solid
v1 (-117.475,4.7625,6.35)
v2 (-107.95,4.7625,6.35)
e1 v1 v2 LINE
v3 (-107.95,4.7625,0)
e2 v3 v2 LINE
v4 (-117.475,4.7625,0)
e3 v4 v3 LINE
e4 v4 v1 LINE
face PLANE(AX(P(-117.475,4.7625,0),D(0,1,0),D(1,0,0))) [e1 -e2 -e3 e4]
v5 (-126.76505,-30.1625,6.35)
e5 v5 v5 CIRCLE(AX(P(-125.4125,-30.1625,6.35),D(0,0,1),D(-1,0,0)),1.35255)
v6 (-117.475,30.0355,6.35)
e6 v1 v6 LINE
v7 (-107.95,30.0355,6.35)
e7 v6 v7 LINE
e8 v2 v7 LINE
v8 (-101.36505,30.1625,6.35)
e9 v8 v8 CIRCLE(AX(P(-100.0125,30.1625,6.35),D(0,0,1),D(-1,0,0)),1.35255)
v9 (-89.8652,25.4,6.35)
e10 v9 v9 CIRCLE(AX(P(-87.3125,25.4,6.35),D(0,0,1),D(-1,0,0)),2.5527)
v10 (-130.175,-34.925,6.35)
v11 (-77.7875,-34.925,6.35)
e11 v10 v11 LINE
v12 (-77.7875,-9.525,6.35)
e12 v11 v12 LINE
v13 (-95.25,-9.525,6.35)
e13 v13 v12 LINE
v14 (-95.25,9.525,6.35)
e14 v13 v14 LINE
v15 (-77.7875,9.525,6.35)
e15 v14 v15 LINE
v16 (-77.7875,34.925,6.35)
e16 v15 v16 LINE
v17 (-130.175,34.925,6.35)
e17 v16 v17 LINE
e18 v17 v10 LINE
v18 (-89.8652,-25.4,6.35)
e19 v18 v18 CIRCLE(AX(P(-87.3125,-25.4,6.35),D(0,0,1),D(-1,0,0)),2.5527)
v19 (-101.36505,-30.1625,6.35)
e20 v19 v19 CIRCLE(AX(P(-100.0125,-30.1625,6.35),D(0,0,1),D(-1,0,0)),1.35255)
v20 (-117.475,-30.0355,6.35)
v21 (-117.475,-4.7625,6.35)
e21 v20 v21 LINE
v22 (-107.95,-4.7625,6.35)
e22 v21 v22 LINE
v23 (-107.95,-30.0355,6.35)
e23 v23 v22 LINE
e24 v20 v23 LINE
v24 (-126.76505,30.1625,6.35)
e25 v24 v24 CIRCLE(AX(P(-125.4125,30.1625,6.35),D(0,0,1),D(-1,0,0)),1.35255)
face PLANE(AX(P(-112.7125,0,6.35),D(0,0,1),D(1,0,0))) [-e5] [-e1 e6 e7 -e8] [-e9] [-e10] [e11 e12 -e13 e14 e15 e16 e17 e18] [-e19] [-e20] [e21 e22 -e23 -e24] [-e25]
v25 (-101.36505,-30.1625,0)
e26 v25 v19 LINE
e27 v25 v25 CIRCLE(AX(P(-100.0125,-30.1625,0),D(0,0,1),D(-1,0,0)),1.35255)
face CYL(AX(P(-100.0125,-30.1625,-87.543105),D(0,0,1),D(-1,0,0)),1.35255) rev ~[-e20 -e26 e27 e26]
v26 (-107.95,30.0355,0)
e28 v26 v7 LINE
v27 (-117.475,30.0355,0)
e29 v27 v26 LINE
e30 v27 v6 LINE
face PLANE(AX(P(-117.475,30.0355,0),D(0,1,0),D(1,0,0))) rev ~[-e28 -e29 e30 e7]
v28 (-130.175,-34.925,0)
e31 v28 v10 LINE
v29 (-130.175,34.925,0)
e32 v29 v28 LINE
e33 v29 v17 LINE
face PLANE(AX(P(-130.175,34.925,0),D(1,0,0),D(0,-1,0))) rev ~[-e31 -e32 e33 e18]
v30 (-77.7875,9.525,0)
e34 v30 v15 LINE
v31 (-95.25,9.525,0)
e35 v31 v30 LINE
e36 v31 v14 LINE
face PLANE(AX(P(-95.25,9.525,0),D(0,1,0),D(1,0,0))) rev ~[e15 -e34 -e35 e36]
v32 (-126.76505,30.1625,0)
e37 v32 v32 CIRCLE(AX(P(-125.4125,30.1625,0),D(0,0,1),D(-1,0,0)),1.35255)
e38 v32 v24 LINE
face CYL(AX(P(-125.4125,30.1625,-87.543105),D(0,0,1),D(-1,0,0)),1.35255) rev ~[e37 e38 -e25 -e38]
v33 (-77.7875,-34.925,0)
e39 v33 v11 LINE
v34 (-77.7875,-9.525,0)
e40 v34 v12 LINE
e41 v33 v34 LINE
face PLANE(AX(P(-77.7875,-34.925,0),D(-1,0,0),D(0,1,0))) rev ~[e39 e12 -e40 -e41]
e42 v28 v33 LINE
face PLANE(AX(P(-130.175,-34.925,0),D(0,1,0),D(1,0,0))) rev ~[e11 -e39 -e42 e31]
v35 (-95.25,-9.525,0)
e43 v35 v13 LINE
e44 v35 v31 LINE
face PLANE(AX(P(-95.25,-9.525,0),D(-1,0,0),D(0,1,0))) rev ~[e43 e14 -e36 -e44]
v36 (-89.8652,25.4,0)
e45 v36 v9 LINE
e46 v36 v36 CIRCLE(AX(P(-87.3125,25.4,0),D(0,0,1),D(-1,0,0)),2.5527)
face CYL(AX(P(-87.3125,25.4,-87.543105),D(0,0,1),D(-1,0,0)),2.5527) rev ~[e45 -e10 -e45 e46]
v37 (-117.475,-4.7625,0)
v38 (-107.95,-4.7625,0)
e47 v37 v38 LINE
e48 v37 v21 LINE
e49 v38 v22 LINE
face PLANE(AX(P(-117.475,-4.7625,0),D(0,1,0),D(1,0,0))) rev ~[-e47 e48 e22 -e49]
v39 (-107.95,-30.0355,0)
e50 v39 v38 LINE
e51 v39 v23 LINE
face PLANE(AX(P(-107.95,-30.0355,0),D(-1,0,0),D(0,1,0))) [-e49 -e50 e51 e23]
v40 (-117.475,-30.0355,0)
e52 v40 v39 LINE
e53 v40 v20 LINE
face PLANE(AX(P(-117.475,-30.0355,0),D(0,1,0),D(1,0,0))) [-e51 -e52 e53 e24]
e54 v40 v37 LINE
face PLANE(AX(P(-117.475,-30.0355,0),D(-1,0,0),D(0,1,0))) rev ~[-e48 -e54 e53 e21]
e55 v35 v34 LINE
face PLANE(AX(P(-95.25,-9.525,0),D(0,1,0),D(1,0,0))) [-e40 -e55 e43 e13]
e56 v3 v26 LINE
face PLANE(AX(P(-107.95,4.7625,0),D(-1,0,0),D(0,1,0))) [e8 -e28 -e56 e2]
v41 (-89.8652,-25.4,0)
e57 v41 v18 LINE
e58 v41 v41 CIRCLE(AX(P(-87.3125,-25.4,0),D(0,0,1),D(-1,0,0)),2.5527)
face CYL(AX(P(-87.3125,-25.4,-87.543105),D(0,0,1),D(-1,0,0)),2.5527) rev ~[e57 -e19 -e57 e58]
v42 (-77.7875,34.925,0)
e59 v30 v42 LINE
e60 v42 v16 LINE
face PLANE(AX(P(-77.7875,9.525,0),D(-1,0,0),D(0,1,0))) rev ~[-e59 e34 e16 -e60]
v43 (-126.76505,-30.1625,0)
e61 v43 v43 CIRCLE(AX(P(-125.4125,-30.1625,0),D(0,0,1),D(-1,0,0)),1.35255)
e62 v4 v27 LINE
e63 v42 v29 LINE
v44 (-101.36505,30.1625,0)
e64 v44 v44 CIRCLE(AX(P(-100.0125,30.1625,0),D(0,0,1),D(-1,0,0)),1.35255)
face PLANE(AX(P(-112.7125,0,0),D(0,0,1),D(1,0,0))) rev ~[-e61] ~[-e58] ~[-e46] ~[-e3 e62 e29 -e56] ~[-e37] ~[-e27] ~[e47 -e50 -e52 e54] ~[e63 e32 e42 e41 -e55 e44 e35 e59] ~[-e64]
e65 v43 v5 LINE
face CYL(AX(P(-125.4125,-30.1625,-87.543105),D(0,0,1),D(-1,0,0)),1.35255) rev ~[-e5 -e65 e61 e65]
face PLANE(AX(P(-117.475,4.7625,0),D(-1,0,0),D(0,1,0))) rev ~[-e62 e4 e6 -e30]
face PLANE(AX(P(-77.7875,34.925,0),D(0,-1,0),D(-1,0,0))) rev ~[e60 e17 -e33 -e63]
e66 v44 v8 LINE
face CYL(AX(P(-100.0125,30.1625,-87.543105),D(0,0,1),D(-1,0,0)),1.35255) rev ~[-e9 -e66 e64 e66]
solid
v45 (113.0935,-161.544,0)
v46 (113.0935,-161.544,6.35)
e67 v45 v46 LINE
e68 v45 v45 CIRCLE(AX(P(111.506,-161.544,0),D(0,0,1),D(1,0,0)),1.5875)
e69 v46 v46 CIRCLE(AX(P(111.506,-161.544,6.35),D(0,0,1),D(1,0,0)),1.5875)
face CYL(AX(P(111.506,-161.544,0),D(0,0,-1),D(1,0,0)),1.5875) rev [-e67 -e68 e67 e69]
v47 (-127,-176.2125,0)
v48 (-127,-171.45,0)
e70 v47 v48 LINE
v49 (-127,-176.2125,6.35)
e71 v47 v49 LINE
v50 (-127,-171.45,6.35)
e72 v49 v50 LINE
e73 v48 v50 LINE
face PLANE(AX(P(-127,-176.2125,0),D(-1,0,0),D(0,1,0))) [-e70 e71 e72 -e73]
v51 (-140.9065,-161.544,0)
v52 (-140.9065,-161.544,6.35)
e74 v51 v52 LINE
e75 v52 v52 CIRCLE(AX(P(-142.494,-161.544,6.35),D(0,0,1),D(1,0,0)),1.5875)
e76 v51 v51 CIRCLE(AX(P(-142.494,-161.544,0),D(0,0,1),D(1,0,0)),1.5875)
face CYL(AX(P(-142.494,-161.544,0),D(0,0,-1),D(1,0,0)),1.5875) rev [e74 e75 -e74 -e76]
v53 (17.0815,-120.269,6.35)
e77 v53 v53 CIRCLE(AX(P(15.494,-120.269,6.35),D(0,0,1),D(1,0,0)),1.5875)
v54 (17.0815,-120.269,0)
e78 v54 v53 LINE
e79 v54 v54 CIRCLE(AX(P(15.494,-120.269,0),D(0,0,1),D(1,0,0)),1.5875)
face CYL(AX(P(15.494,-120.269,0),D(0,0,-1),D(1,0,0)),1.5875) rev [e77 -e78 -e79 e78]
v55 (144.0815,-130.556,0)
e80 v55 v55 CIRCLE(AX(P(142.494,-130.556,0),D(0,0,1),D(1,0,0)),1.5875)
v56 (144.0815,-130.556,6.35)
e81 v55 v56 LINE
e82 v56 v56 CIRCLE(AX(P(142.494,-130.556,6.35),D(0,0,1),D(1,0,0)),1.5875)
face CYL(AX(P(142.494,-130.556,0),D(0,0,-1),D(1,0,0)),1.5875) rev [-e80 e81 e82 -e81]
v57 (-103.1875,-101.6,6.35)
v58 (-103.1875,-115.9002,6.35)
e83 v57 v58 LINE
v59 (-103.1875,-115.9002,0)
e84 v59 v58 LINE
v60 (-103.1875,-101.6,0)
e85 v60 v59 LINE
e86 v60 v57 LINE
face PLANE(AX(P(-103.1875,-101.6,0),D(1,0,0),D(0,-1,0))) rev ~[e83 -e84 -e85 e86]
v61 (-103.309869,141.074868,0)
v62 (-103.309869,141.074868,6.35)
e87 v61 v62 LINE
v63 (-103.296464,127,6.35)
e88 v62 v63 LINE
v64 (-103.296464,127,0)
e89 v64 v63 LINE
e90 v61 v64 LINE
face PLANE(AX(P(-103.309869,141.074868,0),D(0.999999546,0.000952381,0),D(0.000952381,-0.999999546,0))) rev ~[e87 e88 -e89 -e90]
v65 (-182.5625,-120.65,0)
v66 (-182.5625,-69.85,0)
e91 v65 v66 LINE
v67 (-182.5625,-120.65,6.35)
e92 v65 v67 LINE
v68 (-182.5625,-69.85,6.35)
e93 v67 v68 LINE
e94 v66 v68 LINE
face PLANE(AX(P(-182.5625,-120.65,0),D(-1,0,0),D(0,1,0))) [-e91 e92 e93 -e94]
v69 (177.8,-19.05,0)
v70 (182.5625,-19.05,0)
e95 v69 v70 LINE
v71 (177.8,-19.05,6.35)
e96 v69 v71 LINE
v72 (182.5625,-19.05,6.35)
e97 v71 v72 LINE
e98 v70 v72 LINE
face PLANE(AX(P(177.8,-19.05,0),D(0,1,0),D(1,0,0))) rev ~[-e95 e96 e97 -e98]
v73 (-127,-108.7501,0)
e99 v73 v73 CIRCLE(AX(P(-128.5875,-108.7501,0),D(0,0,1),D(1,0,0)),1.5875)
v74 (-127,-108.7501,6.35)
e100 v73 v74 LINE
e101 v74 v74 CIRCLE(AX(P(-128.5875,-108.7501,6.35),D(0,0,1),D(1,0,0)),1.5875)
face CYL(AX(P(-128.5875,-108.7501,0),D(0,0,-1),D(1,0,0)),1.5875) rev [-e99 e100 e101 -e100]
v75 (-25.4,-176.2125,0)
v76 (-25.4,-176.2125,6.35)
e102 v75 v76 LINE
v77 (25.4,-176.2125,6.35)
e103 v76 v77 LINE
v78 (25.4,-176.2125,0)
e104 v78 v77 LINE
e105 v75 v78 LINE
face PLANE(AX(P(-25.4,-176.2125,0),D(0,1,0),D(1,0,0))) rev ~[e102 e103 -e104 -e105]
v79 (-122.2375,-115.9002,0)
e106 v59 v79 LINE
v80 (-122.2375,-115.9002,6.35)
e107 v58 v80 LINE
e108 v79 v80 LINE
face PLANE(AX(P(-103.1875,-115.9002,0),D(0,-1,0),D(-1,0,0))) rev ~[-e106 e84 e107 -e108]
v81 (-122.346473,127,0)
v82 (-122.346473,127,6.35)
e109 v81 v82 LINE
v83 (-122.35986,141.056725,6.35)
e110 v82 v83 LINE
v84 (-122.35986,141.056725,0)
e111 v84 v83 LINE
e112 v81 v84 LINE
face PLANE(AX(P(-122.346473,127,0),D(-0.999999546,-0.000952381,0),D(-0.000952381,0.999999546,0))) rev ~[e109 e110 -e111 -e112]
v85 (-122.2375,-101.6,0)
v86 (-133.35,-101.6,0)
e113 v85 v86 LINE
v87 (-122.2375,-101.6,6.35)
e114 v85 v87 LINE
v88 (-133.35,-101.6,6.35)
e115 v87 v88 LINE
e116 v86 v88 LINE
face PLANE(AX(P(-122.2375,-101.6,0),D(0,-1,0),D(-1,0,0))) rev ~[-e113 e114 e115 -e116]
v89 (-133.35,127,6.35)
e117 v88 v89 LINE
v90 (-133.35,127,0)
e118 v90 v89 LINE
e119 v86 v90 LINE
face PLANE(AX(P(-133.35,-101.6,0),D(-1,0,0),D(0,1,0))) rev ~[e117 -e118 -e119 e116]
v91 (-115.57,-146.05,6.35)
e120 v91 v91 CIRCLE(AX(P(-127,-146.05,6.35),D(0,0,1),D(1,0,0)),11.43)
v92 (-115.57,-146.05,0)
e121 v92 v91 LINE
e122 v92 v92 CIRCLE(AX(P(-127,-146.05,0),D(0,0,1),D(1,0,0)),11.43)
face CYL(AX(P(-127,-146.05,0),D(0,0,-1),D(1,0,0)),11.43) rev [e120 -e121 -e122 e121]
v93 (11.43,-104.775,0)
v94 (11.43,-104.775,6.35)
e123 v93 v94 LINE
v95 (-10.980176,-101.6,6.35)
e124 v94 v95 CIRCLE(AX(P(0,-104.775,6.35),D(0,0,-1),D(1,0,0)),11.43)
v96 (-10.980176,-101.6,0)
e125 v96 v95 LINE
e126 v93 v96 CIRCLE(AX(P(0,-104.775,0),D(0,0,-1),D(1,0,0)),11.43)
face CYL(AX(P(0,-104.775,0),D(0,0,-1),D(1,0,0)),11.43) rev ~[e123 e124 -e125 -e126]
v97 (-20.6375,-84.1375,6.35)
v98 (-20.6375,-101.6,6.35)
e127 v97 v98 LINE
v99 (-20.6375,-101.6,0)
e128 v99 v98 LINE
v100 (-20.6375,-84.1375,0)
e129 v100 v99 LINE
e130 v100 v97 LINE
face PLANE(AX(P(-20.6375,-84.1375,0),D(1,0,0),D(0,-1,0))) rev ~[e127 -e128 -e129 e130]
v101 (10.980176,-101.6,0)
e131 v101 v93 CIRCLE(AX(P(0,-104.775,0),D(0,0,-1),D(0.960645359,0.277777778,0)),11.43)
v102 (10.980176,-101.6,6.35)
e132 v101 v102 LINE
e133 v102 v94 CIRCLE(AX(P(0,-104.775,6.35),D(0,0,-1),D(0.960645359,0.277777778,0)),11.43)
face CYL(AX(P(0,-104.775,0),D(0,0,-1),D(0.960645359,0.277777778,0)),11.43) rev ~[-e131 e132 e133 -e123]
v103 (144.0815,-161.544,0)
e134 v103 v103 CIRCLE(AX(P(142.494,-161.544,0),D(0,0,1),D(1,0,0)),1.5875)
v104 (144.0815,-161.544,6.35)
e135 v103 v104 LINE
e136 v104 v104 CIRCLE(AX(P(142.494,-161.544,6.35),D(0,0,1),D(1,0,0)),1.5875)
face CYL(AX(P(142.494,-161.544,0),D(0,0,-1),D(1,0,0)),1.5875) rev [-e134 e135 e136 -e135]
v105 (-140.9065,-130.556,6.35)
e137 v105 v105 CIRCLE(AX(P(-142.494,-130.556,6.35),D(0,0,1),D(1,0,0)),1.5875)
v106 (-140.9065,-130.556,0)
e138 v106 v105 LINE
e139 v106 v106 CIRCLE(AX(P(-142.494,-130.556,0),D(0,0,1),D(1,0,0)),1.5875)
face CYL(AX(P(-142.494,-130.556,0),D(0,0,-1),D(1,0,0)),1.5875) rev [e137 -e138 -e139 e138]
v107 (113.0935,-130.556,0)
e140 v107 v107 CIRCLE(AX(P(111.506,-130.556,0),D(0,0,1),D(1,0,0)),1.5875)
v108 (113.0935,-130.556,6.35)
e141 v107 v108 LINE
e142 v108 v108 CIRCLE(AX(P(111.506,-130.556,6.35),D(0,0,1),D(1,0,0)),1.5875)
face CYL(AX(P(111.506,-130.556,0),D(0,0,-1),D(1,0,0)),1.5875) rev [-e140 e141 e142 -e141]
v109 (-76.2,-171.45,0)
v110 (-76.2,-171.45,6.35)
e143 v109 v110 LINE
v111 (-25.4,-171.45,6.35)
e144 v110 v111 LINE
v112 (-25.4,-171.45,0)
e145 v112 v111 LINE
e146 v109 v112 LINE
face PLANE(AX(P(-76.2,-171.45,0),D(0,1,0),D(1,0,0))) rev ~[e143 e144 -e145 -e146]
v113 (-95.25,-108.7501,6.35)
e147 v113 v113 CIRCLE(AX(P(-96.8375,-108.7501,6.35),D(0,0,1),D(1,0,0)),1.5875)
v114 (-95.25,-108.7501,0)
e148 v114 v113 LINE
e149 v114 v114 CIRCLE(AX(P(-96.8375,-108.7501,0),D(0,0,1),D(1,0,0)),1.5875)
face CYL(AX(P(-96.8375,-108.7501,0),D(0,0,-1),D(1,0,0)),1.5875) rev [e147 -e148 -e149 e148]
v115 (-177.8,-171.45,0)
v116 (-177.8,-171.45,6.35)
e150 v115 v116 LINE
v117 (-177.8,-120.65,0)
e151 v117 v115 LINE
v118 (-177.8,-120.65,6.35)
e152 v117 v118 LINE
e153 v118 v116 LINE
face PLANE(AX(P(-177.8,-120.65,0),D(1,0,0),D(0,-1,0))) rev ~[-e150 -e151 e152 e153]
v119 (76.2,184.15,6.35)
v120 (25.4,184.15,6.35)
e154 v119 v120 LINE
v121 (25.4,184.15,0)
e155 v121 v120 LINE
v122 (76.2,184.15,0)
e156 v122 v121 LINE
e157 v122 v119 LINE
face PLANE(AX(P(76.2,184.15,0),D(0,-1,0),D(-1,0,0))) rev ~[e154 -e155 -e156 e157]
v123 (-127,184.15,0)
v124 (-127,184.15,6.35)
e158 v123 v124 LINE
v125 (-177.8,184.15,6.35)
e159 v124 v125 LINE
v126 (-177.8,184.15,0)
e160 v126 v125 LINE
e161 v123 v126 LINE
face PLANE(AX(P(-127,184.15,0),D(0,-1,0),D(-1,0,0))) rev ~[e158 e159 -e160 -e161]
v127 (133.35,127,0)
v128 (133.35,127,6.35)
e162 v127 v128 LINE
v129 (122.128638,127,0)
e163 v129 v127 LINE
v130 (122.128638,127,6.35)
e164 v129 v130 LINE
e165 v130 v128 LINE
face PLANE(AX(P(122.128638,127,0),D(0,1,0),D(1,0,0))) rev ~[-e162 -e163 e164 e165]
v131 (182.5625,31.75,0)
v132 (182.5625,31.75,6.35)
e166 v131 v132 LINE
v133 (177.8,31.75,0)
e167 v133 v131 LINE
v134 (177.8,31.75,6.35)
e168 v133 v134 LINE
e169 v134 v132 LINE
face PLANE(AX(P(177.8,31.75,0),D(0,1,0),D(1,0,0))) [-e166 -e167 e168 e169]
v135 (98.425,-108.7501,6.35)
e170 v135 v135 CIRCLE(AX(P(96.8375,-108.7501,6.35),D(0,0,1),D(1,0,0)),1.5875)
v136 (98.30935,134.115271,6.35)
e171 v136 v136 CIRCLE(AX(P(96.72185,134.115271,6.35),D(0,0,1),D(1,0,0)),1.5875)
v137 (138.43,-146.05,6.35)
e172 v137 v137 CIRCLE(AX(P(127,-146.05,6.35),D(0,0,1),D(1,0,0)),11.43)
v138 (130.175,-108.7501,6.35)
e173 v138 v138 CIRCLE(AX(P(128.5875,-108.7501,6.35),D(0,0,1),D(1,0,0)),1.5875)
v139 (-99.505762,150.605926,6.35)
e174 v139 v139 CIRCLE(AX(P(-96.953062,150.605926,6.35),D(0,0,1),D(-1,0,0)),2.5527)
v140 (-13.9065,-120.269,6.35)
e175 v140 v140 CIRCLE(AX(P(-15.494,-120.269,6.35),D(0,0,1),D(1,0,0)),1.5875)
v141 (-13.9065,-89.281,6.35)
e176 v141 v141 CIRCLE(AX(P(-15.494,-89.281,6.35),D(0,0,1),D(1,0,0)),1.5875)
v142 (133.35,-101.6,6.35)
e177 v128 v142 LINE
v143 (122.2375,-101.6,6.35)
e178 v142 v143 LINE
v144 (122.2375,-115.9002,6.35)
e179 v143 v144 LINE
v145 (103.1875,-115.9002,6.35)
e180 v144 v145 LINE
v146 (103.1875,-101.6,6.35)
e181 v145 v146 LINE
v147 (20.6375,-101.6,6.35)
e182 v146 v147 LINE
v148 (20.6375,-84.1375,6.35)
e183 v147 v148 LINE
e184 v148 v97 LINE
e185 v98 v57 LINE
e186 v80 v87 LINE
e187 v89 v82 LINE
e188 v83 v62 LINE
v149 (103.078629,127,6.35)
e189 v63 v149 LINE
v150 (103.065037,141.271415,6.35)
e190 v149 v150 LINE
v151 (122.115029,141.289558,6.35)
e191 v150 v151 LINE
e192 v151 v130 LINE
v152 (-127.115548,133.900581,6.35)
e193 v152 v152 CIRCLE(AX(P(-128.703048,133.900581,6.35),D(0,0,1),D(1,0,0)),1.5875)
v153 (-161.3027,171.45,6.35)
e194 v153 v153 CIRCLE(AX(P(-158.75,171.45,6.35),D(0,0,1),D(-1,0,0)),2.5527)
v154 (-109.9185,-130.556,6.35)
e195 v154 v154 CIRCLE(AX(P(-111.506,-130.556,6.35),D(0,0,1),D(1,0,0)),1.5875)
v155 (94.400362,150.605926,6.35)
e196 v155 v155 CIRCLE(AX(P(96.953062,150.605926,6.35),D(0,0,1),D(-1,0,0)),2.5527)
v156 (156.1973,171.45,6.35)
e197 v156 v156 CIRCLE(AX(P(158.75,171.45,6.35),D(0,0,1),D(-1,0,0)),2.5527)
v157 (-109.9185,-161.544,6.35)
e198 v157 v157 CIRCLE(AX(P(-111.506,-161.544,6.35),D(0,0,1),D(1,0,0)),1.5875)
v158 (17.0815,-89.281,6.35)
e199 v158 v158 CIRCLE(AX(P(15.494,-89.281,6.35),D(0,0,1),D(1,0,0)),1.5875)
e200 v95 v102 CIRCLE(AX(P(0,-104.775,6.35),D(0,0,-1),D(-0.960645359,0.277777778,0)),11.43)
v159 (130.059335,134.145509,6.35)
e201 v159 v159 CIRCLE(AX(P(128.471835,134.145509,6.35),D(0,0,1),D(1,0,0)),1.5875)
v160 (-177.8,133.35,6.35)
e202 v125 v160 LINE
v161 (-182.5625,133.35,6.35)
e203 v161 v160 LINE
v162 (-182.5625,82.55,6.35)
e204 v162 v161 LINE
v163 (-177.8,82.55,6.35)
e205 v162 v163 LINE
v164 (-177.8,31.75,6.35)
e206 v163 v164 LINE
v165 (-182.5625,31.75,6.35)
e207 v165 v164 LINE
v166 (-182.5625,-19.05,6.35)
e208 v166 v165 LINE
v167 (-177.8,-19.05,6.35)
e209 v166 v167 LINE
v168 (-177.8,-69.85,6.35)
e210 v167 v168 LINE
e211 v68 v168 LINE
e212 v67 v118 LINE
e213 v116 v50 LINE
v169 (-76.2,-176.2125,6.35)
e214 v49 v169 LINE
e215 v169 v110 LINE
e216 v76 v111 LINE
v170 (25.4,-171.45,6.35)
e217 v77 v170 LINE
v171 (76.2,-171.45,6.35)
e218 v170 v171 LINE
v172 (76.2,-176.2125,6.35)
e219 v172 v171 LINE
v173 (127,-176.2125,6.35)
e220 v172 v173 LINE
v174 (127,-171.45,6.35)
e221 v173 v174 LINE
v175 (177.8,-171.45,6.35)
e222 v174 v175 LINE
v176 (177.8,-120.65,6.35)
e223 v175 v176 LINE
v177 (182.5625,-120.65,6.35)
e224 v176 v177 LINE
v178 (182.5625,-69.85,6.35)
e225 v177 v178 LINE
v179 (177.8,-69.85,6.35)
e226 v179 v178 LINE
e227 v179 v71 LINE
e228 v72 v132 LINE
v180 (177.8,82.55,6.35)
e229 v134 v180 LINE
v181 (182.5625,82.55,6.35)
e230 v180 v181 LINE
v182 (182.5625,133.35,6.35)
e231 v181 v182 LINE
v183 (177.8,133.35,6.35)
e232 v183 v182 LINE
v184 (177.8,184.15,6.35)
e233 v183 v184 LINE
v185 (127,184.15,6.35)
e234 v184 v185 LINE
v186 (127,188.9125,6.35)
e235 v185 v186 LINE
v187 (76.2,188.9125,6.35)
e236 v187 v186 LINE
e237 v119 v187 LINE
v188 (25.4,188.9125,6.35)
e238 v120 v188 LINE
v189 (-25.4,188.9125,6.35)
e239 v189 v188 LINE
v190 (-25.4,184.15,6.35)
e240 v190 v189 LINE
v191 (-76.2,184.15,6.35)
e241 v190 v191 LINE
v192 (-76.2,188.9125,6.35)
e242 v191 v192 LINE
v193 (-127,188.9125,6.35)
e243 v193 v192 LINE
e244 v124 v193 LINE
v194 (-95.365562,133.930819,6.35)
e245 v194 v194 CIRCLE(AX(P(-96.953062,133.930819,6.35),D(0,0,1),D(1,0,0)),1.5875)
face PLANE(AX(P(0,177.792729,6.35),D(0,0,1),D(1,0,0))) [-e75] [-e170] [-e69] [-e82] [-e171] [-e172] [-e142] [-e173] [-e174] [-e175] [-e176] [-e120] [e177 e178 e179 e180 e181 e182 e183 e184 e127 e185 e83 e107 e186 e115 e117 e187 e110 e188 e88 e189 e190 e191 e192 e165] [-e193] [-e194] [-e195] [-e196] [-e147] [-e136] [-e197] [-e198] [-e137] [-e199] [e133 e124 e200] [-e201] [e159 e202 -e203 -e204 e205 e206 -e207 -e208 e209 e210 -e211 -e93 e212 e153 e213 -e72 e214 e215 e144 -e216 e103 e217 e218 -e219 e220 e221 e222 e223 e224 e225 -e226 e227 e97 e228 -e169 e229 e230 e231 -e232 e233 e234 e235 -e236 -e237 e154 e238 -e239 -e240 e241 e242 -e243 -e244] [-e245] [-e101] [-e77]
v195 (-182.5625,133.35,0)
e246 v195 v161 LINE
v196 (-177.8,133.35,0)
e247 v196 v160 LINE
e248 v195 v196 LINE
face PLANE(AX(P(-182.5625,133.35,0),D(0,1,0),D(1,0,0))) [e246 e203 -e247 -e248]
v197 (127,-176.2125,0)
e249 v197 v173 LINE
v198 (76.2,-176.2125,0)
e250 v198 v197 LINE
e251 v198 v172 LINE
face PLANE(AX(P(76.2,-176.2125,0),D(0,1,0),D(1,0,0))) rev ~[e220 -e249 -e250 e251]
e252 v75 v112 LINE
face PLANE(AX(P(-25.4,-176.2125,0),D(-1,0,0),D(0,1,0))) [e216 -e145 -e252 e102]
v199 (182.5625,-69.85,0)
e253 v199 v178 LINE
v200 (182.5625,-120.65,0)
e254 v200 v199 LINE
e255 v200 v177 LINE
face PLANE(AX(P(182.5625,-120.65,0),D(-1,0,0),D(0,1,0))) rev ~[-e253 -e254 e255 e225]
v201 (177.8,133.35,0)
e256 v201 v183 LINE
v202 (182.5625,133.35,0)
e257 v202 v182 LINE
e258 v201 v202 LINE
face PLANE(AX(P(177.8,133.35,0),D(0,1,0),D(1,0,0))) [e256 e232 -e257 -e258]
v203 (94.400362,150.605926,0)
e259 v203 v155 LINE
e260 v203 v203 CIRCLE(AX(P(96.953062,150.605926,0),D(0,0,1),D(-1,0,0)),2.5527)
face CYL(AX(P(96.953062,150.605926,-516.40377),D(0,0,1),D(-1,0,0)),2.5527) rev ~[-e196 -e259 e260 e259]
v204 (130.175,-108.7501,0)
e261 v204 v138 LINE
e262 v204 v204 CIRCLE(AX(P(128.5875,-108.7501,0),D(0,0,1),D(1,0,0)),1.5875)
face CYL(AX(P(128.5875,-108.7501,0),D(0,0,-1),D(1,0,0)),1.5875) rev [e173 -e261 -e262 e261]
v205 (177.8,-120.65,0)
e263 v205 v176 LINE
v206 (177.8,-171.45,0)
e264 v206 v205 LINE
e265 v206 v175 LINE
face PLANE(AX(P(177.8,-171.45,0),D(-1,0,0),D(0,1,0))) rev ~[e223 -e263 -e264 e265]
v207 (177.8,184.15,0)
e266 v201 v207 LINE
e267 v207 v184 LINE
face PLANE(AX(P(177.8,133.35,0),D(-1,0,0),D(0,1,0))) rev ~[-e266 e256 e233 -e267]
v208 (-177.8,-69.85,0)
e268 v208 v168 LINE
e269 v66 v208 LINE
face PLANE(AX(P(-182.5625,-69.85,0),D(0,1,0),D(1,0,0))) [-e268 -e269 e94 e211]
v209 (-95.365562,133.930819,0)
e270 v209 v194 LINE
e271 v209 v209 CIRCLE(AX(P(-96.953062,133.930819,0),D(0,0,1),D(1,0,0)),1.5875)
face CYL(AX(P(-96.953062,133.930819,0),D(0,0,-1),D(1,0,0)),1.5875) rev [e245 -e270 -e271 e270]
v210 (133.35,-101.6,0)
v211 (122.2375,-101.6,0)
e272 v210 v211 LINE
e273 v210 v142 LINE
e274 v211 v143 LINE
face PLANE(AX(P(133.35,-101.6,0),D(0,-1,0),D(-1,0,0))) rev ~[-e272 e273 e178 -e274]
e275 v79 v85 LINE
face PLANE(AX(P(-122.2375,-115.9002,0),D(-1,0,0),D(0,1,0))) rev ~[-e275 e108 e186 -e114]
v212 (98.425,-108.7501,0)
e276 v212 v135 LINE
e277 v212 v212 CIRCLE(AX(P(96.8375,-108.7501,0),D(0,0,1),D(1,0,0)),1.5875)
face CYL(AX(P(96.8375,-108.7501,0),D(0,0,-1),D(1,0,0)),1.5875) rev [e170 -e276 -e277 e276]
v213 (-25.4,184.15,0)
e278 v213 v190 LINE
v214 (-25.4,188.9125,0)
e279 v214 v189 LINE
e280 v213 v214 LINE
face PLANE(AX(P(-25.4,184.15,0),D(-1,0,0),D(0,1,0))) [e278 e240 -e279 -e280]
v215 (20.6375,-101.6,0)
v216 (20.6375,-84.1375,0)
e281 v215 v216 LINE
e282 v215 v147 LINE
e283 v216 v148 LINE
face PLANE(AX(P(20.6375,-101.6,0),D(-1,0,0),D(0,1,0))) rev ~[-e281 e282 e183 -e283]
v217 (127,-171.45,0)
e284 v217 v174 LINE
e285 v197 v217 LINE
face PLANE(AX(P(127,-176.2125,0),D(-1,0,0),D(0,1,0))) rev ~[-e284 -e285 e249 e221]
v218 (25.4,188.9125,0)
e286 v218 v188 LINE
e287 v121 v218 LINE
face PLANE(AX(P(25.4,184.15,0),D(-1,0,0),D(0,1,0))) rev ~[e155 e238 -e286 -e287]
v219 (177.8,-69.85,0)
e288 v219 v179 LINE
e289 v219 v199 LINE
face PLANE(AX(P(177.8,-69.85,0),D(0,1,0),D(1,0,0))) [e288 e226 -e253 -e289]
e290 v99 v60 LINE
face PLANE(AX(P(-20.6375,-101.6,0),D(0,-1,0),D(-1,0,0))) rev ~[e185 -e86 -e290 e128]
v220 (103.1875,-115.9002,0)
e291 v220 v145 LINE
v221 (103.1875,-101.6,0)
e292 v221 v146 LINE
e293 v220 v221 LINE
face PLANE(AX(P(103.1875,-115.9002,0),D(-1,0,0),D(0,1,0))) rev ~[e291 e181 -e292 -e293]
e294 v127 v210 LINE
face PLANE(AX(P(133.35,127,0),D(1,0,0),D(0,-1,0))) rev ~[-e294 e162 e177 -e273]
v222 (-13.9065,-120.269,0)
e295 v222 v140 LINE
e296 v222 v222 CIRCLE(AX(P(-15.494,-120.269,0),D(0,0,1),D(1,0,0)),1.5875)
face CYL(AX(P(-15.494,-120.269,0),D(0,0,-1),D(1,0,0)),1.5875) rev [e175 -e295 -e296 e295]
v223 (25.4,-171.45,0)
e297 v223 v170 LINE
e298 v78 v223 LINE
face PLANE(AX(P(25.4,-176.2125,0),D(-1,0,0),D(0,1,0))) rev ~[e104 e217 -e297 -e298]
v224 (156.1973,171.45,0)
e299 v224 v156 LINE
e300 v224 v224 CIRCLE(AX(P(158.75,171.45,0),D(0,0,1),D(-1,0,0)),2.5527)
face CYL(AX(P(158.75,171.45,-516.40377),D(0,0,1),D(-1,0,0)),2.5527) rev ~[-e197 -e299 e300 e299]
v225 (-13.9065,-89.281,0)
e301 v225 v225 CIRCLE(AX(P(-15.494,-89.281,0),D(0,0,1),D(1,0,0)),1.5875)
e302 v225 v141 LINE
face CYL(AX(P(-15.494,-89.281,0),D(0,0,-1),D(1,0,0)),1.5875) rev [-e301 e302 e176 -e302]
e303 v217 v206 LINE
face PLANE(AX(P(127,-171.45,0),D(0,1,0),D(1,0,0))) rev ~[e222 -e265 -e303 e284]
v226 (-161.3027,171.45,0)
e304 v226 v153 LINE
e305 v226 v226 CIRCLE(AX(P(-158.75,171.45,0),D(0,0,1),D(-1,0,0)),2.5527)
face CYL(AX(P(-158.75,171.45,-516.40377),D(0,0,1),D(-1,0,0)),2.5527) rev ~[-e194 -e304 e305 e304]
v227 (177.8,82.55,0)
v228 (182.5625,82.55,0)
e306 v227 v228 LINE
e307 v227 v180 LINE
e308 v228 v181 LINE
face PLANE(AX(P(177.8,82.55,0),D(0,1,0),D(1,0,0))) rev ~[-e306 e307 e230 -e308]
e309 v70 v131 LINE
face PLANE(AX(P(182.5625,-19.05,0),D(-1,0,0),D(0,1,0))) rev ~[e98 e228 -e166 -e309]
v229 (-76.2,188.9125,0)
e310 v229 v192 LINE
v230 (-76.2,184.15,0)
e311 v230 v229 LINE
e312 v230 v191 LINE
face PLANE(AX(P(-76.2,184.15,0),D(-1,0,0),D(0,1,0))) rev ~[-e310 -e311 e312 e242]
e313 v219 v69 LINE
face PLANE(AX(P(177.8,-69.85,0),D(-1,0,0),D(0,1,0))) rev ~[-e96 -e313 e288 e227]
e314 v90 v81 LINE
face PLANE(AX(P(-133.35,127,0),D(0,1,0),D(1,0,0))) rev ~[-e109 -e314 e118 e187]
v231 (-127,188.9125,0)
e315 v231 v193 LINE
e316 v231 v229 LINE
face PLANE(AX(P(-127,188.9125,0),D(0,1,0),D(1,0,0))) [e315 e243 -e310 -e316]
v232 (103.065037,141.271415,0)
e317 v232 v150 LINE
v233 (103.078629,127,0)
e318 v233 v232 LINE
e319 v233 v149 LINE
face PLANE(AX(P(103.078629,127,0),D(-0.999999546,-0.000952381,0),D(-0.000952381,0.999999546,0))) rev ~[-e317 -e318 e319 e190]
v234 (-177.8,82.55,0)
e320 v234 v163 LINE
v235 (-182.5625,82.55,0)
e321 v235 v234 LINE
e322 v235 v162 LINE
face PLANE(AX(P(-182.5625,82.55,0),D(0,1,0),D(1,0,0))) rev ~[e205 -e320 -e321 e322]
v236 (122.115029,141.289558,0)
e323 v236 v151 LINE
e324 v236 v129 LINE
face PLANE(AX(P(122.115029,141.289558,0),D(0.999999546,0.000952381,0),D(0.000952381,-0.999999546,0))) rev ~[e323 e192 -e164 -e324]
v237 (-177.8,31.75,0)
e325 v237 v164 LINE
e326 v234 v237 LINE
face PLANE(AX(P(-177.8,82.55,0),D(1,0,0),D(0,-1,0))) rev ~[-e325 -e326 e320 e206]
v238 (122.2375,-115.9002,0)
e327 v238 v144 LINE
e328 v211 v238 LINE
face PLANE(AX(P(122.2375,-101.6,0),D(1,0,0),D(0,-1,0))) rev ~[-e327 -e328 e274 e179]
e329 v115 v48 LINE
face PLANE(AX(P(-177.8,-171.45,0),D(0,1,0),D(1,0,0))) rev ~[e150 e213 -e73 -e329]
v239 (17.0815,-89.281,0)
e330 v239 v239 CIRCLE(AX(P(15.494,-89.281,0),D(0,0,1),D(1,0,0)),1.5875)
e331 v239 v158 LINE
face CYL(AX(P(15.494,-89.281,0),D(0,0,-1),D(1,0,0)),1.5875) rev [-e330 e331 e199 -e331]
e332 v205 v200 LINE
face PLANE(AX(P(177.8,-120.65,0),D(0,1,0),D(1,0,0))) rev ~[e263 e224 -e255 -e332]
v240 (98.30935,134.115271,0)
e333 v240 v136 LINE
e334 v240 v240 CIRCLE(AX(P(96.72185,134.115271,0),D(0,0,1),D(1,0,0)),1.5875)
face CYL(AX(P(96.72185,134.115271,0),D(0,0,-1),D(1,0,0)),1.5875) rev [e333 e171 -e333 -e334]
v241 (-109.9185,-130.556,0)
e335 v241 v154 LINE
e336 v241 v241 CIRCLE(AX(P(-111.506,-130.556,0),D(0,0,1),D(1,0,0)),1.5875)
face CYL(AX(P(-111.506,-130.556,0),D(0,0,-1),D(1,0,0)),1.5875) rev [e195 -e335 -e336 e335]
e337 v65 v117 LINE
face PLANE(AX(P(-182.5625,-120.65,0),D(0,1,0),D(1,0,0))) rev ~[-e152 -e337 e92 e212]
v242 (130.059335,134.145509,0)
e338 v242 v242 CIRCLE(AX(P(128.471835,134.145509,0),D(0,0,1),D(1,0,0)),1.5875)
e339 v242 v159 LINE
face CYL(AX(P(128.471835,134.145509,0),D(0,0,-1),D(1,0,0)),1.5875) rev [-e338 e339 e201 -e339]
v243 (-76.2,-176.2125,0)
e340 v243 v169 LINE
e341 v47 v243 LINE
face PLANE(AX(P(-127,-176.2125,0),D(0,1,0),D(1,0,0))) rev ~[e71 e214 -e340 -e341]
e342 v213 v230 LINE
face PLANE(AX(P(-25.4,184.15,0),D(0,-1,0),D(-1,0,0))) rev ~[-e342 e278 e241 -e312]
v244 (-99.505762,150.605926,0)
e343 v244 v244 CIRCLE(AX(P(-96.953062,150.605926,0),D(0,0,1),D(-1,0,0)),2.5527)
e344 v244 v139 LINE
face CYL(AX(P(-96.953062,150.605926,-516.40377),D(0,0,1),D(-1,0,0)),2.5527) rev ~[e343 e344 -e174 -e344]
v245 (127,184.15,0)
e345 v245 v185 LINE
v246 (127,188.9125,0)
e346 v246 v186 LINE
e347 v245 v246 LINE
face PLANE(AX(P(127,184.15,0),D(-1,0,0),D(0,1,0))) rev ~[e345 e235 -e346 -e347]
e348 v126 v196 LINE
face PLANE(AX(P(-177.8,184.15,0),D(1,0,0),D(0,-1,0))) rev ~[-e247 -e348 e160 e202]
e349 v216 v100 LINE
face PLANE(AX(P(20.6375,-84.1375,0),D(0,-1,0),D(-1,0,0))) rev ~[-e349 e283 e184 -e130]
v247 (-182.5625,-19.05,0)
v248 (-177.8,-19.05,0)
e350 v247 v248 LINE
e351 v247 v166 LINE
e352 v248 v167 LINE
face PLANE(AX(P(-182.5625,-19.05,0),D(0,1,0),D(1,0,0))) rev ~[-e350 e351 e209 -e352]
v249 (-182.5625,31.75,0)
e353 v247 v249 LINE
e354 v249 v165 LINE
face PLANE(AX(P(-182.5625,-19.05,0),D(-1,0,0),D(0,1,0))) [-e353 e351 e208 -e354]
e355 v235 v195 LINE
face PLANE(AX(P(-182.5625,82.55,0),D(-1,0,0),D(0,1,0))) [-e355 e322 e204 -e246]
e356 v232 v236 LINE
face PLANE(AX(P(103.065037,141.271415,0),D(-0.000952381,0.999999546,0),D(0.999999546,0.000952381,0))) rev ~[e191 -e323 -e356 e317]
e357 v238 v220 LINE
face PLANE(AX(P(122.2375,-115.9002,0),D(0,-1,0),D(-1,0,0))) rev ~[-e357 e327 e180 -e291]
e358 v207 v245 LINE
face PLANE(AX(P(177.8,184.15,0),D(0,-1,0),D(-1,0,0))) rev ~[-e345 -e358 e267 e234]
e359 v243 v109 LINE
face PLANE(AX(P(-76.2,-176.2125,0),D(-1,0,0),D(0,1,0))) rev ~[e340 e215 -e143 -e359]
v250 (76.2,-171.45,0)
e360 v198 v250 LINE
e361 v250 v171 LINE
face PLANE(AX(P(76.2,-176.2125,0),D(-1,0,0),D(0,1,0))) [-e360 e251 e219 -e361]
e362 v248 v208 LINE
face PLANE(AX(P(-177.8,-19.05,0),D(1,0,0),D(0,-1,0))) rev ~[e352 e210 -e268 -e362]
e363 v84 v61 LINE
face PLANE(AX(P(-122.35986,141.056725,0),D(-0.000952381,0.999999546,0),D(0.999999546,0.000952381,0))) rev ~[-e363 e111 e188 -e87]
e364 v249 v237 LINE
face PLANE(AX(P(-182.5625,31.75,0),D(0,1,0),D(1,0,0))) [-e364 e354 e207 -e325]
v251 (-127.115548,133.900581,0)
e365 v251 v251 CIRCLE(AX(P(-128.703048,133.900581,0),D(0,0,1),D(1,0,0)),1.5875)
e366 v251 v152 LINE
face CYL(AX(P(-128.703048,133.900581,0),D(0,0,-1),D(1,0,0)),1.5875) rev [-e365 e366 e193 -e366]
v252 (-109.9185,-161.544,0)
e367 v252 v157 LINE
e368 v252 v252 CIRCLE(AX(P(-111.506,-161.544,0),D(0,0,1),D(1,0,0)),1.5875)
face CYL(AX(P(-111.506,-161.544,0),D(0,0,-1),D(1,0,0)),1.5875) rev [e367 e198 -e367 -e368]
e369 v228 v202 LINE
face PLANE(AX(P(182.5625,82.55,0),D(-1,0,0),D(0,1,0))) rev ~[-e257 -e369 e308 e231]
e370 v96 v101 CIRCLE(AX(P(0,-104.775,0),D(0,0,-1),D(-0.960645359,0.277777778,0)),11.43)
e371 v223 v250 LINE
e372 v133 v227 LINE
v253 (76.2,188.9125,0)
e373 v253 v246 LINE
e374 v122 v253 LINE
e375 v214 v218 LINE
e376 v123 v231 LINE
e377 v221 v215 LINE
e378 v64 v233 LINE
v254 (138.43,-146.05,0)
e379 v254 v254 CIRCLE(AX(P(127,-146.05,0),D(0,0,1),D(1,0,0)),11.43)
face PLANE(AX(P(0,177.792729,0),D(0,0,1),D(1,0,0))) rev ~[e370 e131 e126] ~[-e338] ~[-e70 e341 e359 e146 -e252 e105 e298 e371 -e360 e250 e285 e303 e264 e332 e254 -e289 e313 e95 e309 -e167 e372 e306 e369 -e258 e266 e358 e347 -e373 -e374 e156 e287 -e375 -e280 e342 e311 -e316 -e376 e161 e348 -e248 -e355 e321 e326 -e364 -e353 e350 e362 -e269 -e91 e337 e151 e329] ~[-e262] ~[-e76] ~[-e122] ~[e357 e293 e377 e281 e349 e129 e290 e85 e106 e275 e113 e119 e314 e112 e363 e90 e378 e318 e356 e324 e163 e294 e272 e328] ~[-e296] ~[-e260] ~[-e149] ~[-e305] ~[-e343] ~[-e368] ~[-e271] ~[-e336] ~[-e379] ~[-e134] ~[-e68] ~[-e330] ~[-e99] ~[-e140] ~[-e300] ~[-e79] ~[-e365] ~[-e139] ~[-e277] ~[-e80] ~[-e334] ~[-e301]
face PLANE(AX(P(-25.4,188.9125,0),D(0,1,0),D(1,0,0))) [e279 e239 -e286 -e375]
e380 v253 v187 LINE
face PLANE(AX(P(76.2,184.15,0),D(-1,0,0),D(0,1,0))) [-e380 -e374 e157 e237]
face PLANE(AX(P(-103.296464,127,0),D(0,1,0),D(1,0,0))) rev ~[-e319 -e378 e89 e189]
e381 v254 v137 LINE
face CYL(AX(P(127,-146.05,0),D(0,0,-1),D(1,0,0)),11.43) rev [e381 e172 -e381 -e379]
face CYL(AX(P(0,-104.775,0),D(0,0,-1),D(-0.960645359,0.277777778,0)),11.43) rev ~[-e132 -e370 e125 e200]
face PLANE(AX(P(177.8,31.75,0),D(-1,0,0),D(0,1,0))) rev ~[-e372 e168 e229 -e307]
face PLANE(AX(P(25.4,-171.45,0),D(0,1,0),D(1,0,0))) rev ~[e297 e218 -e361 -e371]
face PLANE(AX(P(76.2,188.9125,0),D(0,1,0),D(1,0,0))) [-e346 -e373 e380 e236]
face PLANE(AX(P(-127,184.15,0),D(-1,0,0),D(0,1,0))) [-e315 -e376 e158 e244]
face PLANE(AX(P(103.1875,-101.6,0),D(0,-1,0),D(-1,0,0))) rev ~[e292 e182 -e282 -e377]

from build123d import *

# Parameters (mm, degrees)
F0_R     = 1.5875
F0_R_2   = 11.43
F0_R_3   = 3.175
F0_W     = 4.7625
F0_H     = 50.8
F0_W_2   = 50.8
F0_H_2   = 4.7625
F0_W_3   = 44.45
F0_H_3   = 41.1268851364
F1_DEPTH = 6.35
F0_R_4   = 1.8415
F0_W_4   = 9.525
F0_H_4   = 25.273
F0_W_5   = 17.4625
F0_H_5   = 25.4
F2_D     = 2.7051
F3_D     = 5.1054
F4_D     = 5.1054


# Not quite as in the source:
# - a feature names something its author has since deleted; it is built from what else it names


with BuildPart() as f1:
    # F0 (on Top) → F1 (new body)
    with BuildSketch(Plane.XY):
        with BuildLine():
            ThreePointArc((155.575, 171.45), (158.75, 174.625), (161.925, 171.45))
            Line((161.925, 171.45), (177.8, 171.45))
            Line((177.8, 171.45), (177.8, 184.15))
            Line((177.8, 184.15), (127, 184.15))
            Line((127, 184.15), (76.2, 184.15))
            Line((76.2, 184.15), (25.4, 184.15))
            Line((25.4, 184.15), (-25.4, 184.15))
            Line((-25.4, 184.15), (-76.2, 184.15))
            Line((-76.2, 184.15), (-127, 184.15))
            Line((-127, 184.15), (-177.8, 184.15))
            Line((-177.8, 184.15), (-177.8, 171.45))
            Line((-177.8, 171.45), (-161.925, 171.45))
            ThreePointArc((-161.925, 171.45), (-158.75, 174.625), (-155.575, 171.45))
            Line((-155.575, 171.45), (155.575, 171.45))
        make_face()
        with BuildLine():
            ThreePointArc((155.575, 171.45), (158.75, 168.275), (161.925, 171.45))
            Line((161.925, 171.45), (155.575, 171.45))
        make_face()
        with BuildLine():
            Line((155.575, 171.45), (161.925, 171.45))
            ThreePointArc((161.925, 171.45), (158.75, 174.625), (155.575, 171.45))
        make_face()
        with BuildLine():
            Line((177.8, 171.45), (161.925, 171.45))
            ThreePointArc((161.925, 171.45), (158.75, 168.275), (155.575, 171.45))
            Line((155.575, 171.45), (-155.575, 171.45))
            ThreePointArc((-155.575, 171.45), (-158.75, 168.275), (-161.925, 171.45))
            Line((-161.925, 171.45), (-177.8, 171.45))
            Line((-177.8, 171.45), (-177.8, 133.35))
            Line((-177.8, 133.35), (-177.8, 82.55))
            Line((-177.8, 82.55), (-177.8, 31.75))
            Line((-177.8, 31.75), (-177.8, -19.05))
            Line((-177.8, -19.05), (-177.8, -69.85))
            Line((-177.8, -69.85), (-177.8, -120.65))
            Line((-177.8, -120.65), (-177.8, -171.45))
            Line((-177.8, -171.45), (-127, -171.45))
            Line((-127, -171.45), (-76.2, -171.45))
            Line((-76.2, -171.45), (-25.4, -171.45))
            Line((-25.4, -171.45), (25.4, -171.45))
            Line((25.4, -171.45), (76.2, -171.45))
            Line((76.2, -171.45), (127, -171.45))
            Line((127, -171.45), (177.8, -171.45))
            Line((177.8, -171.45), (177.8, -120.65))
            Line((177.8, -120.65), (177.8, -69.85))
            Line((177.8, -69.85), (177.8, -19.05))
            Line((177.8, -19.05), (177.8, 31.75))
            Line((177.8, 31.75), (177.8, 82.55))
            Line((177.8, 82.55), (177.8, 133.35))
            Line((177.8, 133.35), (177.8, 171.45))
        make_face()
        with Locations((-142.494, -161.544)):
            Circle(F0_R, mode=Mode.SUBTRACT)
        with Locations((-111.506, -161.544)):
            Circle(F0_R, mode=Mode.SUBTRACT)
        with Locations((-127, -146.05)):
            Circle(F0_R_2, mode=Mode.SUBTRACT)
        with Locations((-142.494, -130.556)):
            Circle(F0_R, mode=Mode.SUBTRACT)
        with Locations((-128.5875, -108.7501)):
            Circle(F0_R, mode=Mode.SUBTRACT)
        with Locations((-111.506, -130.556)):
            Circle(F0_R, mode=Mode.SUBTRACT)
        with Locations((-96.8375, -108.7501)):
            Circle(F0_R, mode=Mode.SUBTRACT)
        with Locations((111.506, -161.544)):
            Circle(F0_R, mode=Mode.SUBTRACT)
        with Locations((127, -146.05)):
            Circle(F0_R_2, mode=Mode.SUBTRACT)
        with Locations((142.494, -161.544)):
            Circle(F0_R, mode=Mode.SUBTRACT)
        with Locations((111.506, -130.556)):
            Circle(F0_R, mode=Mode.SUBTRACT)
        with Locations((96.8375, -108.7501)):
            Circle(F0_R, mode=Mode.SUBTRACT)
        with Locations((128.5875, -108.7501)):
            Circle(F0_R, mode=Mode.SUBTRACT)
        with Locations((142.494, -130.556)):
            Circle(F0_R, mode=Mode.SUBTRACT)
        with Locations((-128.7030479432, 133.9005806915)):
            Circle(F0_R, mode=Mode.SUBTRACT)
        with Locations((-96.9530623423, 133.9308187798)):
            Circle(F0_R, mode=Mode.SUBTRACT)
        with Locations((-96.9530623423, 150.6059263422)):
            Circle(F0_R_3, mode=Mode.SUBTRACT)
        Polygon((-122.2375, -101.6), (-133.35, -101.6), (-133.35, 126.746051779), (-133.35, 127), (-122.3464730803, 127), (-122.3598604405, 141.0567250664), (-103.30986908, 141.0748679195), (-103.2964644408, 127), (-22.225, 127), (-22.225, 168.1268851364), (22.225, 168.1268851364), (22.225, 127), (103.0786291533, 127), (103.065037326, 141.2714154939), (122.1150286865, 141.289558347), (122.1286377928, 127), (133.2411428818, 127), (133.35, 127), (133.35, -101.6), (122.2375, -101.6), (122.2375, -115.9002), (103.1875, -115.9002), (103.1875, -101.6), (20.6375, -101.6), (20.6375, -125.4125), (-20.6375, -125.4125), (-20.6375, -101.6), (-103.1875, -101.6), (-103.1875, -115.9002), (-122.2375, -115.9002), align=None, mode=Mode.SUBTRACT)
        with Locations((96.7218498233, 134.115271119)):
            Circle(F0_R, mode=Mode.SUBTRACT)
        with Locations((128.4718354242, 134.1455092073)):
            Circle(F0_R, mode=Mode.SUBTRACT)
        with Locations((96.9530623423, 150.6059263422)):
            Circle(F0_R_3, mode=Mode.SUBTRACT)
        with Locations((180.18125, 107.95)):
            Rectangle(F0_W, F0_H)
        with BuildLine():
            ThreePointArc((-161.925, 171.45), (-158.75, 168.275), (-155.575, 171.45))
            Line((-155.575, 171.45), (-161.925, 171.45))
        make_face()
        with BuildLine():
            Line((-161.925, 171.45), (-155.575, 171.45))
            ThreePointArc((-155.575, 171.45), (-158.75, 174.625), (-161.925, 171.45))
        make_face()
        with Locations((101.6, 186.53125)):
            Rectangle(F0_W_2, F0_H_2)
        with Locations((180.18125, 6.35)):
            Rectangle(F0_W, F0_H)
        with Locations((0, 186.53125)):
            Rectangle(F0_W_2, F0_H_2)
        with Locations((-180.18125, 107.95)):
            Rectangle(F0_W, F0_H)
        with Locations((180.18125, -95.25)):
            Rectangle(F0_W, F0_H)
        with Locations((-101.6, 186.53125)):
            Rectangle(F0_W_2, F0_H_2)
        with Locations((-180.18125, 6.35)):
            Rectangle(F0_W, F0_H)
        with Locations((101.6, -173.83125)):
            Rectangle(F0_W_2, F0_H_2)
        with Locations((-180.18125, -95.25)):
            Rectangle(F0_W, F0_H)
        with Locations((0, -173.83125)):
            Rectangle(F0_W_2, F0_H_2)
        with Locations((-101.6, -173.83125)):
            Rectangle(F0_W_2, F0_H_2)
        with BuildLine():
            Line((-20.6375, -84.1375), (-20.6375, -101.6))
            Line((-20.6375, -101.6), (-10.9801764558, -101.6))
            ThreePointArc((-10.9801764558, -101.6), (0, -93.345), (10.9801764558, -101.6))
            Line((10.9801764558, -101.6), (20.6375, -101.6))
            Line((20.6375, -101.6), (20.6375, -84.1375))
            Line((20.6375, -84.1375), (-20.6375, -84.1375))
        make_face()
        with Locations((-15.494, -89.281)):
            Circle(F0_R, mode=Mode.SUBTRACT)
        with Locations((15.494, -89.281)):
            Circle(F0_R, mode=Mode.SUBTRACT)
        with BuildLine():
            Line((-10.9801764558, -101.6), (-20.6375, -101.6))
            Line((-20.6375, -101.6), (-20.6375, -125.4125))
            Line((-20.6375, -125.4125), (20.6375, -125.4125))
            Line((20.6375, -125.4125), (20.6375, -101.6))
            Line((20.6375, -101.6), (10.9801764558, -101.6))
            ThreePointArc((10.9801764558, -101.6), (11.3169853956, -103.1716467778), (11.43, -104.775))
            ThreePointArc((11.43, -104.775), (-1.6033532222, -116.0919853956), (-10.9801764558, -101.6))
        make_face()
        with Locations((-15.494, -120.269)):
            Circle(F0_R, mode=Mode.SUBTRACT)
        with Locations((15.494, -120.269)):
            Circle(F0_R, mode=Mode.SUBTRACT)
        with Locations((0, 147.5634425682)):
            Rectangle(F0_W_3, F0_H_3)
        with Locations((-96.9530623423, 150.6059263422)):
            Circle(F0_R_3)
        with Locations((96.9530623423, 150.6059263422)):
            Circle(F0_R_3)
    extrude(amount=F1_DEPTH)

    # F4 (through all)
    with Locations(Plane(origin=(0, 0, 0), x_dir=(1, 0, 0), z_dir=(0, 0, -1))):
        with Locations((-158.75, -171.45), (-96.9530623423, -150.6059263422), (96.9530623423, -150.6059263422), (158.75, -171.45)):
            Hole(F4_D / 2)


with BuildPart() as f1b:
    # F0 (on Top) → F1, piece 2 (new body)
    with BuildSketch(Plane.XY):
        Polygon((-100.0125, 34.925), (-130.175, 34.925), (-130.175, -34.925), (-100.0125, -34.925), (-95.25, -34.925), (-95.25, -9.525), (-95.25, 9.525), (-95.25, 34.925), align=None)
        with Locations((-125.4125, -30.1625)):
            Circle(F0_R_4, mode=Mode.SUBTRACT)
        with Locations((-100.0125, -30.1625)):
            Circle(F0_R_4, mode=Mode.SUBTRACT)
        with Locations((-112.7125, -17.399)):
            Rectangle(F0_W_4, F0_H_4, mode=Mode.SUBTRACT)
        with Locations((-112.7125, 17.399)):
            Rectangle(F0_W_4, F0_H_4, mode=Mode.SUBTRACT)
        with Locations((-125.4125, 30.1625)):
            Circle(F0_R_4, mode=Mode.SUBTRACT)
        with Locations((-100.0125, 30.1625)):
            Circle(F0_R_4, mode=Mode.SUBTRACT)
        with Locations((-86.51875, 22.225)):
            Rectangle(F0_W_5, F0_H_5)
        with Locations((-87.3125, 25.4)):
            Circle(F0_R_3, mode=Mode.SUBTRACT)
        with Locations((-86.51875, -22.225)):
            Rectangle(F0_W_5, F0_H_5)
        with Locations((-87.3125, -25.4)):
            Circle(F0_R_3, mode=Mode.SUBTRACT)
        with Locations((-87.3125, 25.4)):
            Circle(F0_R_3)
        with Locations((-87.3125, -25.4)):
            Circle(F0_R_3)
        with Locations((-125.4125, 30.1625)):
            Circle(F0_R_4)
        with Locations((-100.0125, 30.1625)):
            Circle(F0_R_4)
        with Locations((-125.4125, -30.1625)):
            Circle(F0_R_4)
        with Locations((-100.0125, -30.1625)):
            Circle(F0_R_4)
    extrude(amount=F1_DEPTH)

    # F2 (through all)
    with Locations(Plane(origin=(0, 0, 0), x_dir=(1, 0, 0), z_dir=(0, 0, -1))):
        with Locations((-125.4125, -30.1625), (-100.0125, -30.1625), (-100.0125, 30.1625), (-125.4125, 30.1625)):
            Hole(F2_D / 2)

    # F3 (through all)
    with Locations(Plane(origin=(0, 0, 0), x_dir=(1, 0, 0), z_dir=(0, 0, -1))):
        with Locations((-87.3125, -25.4), (-87.3125, 25.4)):
            Hole(F3_D / 2)


solid = Compound([f1.part, f1b.part])
